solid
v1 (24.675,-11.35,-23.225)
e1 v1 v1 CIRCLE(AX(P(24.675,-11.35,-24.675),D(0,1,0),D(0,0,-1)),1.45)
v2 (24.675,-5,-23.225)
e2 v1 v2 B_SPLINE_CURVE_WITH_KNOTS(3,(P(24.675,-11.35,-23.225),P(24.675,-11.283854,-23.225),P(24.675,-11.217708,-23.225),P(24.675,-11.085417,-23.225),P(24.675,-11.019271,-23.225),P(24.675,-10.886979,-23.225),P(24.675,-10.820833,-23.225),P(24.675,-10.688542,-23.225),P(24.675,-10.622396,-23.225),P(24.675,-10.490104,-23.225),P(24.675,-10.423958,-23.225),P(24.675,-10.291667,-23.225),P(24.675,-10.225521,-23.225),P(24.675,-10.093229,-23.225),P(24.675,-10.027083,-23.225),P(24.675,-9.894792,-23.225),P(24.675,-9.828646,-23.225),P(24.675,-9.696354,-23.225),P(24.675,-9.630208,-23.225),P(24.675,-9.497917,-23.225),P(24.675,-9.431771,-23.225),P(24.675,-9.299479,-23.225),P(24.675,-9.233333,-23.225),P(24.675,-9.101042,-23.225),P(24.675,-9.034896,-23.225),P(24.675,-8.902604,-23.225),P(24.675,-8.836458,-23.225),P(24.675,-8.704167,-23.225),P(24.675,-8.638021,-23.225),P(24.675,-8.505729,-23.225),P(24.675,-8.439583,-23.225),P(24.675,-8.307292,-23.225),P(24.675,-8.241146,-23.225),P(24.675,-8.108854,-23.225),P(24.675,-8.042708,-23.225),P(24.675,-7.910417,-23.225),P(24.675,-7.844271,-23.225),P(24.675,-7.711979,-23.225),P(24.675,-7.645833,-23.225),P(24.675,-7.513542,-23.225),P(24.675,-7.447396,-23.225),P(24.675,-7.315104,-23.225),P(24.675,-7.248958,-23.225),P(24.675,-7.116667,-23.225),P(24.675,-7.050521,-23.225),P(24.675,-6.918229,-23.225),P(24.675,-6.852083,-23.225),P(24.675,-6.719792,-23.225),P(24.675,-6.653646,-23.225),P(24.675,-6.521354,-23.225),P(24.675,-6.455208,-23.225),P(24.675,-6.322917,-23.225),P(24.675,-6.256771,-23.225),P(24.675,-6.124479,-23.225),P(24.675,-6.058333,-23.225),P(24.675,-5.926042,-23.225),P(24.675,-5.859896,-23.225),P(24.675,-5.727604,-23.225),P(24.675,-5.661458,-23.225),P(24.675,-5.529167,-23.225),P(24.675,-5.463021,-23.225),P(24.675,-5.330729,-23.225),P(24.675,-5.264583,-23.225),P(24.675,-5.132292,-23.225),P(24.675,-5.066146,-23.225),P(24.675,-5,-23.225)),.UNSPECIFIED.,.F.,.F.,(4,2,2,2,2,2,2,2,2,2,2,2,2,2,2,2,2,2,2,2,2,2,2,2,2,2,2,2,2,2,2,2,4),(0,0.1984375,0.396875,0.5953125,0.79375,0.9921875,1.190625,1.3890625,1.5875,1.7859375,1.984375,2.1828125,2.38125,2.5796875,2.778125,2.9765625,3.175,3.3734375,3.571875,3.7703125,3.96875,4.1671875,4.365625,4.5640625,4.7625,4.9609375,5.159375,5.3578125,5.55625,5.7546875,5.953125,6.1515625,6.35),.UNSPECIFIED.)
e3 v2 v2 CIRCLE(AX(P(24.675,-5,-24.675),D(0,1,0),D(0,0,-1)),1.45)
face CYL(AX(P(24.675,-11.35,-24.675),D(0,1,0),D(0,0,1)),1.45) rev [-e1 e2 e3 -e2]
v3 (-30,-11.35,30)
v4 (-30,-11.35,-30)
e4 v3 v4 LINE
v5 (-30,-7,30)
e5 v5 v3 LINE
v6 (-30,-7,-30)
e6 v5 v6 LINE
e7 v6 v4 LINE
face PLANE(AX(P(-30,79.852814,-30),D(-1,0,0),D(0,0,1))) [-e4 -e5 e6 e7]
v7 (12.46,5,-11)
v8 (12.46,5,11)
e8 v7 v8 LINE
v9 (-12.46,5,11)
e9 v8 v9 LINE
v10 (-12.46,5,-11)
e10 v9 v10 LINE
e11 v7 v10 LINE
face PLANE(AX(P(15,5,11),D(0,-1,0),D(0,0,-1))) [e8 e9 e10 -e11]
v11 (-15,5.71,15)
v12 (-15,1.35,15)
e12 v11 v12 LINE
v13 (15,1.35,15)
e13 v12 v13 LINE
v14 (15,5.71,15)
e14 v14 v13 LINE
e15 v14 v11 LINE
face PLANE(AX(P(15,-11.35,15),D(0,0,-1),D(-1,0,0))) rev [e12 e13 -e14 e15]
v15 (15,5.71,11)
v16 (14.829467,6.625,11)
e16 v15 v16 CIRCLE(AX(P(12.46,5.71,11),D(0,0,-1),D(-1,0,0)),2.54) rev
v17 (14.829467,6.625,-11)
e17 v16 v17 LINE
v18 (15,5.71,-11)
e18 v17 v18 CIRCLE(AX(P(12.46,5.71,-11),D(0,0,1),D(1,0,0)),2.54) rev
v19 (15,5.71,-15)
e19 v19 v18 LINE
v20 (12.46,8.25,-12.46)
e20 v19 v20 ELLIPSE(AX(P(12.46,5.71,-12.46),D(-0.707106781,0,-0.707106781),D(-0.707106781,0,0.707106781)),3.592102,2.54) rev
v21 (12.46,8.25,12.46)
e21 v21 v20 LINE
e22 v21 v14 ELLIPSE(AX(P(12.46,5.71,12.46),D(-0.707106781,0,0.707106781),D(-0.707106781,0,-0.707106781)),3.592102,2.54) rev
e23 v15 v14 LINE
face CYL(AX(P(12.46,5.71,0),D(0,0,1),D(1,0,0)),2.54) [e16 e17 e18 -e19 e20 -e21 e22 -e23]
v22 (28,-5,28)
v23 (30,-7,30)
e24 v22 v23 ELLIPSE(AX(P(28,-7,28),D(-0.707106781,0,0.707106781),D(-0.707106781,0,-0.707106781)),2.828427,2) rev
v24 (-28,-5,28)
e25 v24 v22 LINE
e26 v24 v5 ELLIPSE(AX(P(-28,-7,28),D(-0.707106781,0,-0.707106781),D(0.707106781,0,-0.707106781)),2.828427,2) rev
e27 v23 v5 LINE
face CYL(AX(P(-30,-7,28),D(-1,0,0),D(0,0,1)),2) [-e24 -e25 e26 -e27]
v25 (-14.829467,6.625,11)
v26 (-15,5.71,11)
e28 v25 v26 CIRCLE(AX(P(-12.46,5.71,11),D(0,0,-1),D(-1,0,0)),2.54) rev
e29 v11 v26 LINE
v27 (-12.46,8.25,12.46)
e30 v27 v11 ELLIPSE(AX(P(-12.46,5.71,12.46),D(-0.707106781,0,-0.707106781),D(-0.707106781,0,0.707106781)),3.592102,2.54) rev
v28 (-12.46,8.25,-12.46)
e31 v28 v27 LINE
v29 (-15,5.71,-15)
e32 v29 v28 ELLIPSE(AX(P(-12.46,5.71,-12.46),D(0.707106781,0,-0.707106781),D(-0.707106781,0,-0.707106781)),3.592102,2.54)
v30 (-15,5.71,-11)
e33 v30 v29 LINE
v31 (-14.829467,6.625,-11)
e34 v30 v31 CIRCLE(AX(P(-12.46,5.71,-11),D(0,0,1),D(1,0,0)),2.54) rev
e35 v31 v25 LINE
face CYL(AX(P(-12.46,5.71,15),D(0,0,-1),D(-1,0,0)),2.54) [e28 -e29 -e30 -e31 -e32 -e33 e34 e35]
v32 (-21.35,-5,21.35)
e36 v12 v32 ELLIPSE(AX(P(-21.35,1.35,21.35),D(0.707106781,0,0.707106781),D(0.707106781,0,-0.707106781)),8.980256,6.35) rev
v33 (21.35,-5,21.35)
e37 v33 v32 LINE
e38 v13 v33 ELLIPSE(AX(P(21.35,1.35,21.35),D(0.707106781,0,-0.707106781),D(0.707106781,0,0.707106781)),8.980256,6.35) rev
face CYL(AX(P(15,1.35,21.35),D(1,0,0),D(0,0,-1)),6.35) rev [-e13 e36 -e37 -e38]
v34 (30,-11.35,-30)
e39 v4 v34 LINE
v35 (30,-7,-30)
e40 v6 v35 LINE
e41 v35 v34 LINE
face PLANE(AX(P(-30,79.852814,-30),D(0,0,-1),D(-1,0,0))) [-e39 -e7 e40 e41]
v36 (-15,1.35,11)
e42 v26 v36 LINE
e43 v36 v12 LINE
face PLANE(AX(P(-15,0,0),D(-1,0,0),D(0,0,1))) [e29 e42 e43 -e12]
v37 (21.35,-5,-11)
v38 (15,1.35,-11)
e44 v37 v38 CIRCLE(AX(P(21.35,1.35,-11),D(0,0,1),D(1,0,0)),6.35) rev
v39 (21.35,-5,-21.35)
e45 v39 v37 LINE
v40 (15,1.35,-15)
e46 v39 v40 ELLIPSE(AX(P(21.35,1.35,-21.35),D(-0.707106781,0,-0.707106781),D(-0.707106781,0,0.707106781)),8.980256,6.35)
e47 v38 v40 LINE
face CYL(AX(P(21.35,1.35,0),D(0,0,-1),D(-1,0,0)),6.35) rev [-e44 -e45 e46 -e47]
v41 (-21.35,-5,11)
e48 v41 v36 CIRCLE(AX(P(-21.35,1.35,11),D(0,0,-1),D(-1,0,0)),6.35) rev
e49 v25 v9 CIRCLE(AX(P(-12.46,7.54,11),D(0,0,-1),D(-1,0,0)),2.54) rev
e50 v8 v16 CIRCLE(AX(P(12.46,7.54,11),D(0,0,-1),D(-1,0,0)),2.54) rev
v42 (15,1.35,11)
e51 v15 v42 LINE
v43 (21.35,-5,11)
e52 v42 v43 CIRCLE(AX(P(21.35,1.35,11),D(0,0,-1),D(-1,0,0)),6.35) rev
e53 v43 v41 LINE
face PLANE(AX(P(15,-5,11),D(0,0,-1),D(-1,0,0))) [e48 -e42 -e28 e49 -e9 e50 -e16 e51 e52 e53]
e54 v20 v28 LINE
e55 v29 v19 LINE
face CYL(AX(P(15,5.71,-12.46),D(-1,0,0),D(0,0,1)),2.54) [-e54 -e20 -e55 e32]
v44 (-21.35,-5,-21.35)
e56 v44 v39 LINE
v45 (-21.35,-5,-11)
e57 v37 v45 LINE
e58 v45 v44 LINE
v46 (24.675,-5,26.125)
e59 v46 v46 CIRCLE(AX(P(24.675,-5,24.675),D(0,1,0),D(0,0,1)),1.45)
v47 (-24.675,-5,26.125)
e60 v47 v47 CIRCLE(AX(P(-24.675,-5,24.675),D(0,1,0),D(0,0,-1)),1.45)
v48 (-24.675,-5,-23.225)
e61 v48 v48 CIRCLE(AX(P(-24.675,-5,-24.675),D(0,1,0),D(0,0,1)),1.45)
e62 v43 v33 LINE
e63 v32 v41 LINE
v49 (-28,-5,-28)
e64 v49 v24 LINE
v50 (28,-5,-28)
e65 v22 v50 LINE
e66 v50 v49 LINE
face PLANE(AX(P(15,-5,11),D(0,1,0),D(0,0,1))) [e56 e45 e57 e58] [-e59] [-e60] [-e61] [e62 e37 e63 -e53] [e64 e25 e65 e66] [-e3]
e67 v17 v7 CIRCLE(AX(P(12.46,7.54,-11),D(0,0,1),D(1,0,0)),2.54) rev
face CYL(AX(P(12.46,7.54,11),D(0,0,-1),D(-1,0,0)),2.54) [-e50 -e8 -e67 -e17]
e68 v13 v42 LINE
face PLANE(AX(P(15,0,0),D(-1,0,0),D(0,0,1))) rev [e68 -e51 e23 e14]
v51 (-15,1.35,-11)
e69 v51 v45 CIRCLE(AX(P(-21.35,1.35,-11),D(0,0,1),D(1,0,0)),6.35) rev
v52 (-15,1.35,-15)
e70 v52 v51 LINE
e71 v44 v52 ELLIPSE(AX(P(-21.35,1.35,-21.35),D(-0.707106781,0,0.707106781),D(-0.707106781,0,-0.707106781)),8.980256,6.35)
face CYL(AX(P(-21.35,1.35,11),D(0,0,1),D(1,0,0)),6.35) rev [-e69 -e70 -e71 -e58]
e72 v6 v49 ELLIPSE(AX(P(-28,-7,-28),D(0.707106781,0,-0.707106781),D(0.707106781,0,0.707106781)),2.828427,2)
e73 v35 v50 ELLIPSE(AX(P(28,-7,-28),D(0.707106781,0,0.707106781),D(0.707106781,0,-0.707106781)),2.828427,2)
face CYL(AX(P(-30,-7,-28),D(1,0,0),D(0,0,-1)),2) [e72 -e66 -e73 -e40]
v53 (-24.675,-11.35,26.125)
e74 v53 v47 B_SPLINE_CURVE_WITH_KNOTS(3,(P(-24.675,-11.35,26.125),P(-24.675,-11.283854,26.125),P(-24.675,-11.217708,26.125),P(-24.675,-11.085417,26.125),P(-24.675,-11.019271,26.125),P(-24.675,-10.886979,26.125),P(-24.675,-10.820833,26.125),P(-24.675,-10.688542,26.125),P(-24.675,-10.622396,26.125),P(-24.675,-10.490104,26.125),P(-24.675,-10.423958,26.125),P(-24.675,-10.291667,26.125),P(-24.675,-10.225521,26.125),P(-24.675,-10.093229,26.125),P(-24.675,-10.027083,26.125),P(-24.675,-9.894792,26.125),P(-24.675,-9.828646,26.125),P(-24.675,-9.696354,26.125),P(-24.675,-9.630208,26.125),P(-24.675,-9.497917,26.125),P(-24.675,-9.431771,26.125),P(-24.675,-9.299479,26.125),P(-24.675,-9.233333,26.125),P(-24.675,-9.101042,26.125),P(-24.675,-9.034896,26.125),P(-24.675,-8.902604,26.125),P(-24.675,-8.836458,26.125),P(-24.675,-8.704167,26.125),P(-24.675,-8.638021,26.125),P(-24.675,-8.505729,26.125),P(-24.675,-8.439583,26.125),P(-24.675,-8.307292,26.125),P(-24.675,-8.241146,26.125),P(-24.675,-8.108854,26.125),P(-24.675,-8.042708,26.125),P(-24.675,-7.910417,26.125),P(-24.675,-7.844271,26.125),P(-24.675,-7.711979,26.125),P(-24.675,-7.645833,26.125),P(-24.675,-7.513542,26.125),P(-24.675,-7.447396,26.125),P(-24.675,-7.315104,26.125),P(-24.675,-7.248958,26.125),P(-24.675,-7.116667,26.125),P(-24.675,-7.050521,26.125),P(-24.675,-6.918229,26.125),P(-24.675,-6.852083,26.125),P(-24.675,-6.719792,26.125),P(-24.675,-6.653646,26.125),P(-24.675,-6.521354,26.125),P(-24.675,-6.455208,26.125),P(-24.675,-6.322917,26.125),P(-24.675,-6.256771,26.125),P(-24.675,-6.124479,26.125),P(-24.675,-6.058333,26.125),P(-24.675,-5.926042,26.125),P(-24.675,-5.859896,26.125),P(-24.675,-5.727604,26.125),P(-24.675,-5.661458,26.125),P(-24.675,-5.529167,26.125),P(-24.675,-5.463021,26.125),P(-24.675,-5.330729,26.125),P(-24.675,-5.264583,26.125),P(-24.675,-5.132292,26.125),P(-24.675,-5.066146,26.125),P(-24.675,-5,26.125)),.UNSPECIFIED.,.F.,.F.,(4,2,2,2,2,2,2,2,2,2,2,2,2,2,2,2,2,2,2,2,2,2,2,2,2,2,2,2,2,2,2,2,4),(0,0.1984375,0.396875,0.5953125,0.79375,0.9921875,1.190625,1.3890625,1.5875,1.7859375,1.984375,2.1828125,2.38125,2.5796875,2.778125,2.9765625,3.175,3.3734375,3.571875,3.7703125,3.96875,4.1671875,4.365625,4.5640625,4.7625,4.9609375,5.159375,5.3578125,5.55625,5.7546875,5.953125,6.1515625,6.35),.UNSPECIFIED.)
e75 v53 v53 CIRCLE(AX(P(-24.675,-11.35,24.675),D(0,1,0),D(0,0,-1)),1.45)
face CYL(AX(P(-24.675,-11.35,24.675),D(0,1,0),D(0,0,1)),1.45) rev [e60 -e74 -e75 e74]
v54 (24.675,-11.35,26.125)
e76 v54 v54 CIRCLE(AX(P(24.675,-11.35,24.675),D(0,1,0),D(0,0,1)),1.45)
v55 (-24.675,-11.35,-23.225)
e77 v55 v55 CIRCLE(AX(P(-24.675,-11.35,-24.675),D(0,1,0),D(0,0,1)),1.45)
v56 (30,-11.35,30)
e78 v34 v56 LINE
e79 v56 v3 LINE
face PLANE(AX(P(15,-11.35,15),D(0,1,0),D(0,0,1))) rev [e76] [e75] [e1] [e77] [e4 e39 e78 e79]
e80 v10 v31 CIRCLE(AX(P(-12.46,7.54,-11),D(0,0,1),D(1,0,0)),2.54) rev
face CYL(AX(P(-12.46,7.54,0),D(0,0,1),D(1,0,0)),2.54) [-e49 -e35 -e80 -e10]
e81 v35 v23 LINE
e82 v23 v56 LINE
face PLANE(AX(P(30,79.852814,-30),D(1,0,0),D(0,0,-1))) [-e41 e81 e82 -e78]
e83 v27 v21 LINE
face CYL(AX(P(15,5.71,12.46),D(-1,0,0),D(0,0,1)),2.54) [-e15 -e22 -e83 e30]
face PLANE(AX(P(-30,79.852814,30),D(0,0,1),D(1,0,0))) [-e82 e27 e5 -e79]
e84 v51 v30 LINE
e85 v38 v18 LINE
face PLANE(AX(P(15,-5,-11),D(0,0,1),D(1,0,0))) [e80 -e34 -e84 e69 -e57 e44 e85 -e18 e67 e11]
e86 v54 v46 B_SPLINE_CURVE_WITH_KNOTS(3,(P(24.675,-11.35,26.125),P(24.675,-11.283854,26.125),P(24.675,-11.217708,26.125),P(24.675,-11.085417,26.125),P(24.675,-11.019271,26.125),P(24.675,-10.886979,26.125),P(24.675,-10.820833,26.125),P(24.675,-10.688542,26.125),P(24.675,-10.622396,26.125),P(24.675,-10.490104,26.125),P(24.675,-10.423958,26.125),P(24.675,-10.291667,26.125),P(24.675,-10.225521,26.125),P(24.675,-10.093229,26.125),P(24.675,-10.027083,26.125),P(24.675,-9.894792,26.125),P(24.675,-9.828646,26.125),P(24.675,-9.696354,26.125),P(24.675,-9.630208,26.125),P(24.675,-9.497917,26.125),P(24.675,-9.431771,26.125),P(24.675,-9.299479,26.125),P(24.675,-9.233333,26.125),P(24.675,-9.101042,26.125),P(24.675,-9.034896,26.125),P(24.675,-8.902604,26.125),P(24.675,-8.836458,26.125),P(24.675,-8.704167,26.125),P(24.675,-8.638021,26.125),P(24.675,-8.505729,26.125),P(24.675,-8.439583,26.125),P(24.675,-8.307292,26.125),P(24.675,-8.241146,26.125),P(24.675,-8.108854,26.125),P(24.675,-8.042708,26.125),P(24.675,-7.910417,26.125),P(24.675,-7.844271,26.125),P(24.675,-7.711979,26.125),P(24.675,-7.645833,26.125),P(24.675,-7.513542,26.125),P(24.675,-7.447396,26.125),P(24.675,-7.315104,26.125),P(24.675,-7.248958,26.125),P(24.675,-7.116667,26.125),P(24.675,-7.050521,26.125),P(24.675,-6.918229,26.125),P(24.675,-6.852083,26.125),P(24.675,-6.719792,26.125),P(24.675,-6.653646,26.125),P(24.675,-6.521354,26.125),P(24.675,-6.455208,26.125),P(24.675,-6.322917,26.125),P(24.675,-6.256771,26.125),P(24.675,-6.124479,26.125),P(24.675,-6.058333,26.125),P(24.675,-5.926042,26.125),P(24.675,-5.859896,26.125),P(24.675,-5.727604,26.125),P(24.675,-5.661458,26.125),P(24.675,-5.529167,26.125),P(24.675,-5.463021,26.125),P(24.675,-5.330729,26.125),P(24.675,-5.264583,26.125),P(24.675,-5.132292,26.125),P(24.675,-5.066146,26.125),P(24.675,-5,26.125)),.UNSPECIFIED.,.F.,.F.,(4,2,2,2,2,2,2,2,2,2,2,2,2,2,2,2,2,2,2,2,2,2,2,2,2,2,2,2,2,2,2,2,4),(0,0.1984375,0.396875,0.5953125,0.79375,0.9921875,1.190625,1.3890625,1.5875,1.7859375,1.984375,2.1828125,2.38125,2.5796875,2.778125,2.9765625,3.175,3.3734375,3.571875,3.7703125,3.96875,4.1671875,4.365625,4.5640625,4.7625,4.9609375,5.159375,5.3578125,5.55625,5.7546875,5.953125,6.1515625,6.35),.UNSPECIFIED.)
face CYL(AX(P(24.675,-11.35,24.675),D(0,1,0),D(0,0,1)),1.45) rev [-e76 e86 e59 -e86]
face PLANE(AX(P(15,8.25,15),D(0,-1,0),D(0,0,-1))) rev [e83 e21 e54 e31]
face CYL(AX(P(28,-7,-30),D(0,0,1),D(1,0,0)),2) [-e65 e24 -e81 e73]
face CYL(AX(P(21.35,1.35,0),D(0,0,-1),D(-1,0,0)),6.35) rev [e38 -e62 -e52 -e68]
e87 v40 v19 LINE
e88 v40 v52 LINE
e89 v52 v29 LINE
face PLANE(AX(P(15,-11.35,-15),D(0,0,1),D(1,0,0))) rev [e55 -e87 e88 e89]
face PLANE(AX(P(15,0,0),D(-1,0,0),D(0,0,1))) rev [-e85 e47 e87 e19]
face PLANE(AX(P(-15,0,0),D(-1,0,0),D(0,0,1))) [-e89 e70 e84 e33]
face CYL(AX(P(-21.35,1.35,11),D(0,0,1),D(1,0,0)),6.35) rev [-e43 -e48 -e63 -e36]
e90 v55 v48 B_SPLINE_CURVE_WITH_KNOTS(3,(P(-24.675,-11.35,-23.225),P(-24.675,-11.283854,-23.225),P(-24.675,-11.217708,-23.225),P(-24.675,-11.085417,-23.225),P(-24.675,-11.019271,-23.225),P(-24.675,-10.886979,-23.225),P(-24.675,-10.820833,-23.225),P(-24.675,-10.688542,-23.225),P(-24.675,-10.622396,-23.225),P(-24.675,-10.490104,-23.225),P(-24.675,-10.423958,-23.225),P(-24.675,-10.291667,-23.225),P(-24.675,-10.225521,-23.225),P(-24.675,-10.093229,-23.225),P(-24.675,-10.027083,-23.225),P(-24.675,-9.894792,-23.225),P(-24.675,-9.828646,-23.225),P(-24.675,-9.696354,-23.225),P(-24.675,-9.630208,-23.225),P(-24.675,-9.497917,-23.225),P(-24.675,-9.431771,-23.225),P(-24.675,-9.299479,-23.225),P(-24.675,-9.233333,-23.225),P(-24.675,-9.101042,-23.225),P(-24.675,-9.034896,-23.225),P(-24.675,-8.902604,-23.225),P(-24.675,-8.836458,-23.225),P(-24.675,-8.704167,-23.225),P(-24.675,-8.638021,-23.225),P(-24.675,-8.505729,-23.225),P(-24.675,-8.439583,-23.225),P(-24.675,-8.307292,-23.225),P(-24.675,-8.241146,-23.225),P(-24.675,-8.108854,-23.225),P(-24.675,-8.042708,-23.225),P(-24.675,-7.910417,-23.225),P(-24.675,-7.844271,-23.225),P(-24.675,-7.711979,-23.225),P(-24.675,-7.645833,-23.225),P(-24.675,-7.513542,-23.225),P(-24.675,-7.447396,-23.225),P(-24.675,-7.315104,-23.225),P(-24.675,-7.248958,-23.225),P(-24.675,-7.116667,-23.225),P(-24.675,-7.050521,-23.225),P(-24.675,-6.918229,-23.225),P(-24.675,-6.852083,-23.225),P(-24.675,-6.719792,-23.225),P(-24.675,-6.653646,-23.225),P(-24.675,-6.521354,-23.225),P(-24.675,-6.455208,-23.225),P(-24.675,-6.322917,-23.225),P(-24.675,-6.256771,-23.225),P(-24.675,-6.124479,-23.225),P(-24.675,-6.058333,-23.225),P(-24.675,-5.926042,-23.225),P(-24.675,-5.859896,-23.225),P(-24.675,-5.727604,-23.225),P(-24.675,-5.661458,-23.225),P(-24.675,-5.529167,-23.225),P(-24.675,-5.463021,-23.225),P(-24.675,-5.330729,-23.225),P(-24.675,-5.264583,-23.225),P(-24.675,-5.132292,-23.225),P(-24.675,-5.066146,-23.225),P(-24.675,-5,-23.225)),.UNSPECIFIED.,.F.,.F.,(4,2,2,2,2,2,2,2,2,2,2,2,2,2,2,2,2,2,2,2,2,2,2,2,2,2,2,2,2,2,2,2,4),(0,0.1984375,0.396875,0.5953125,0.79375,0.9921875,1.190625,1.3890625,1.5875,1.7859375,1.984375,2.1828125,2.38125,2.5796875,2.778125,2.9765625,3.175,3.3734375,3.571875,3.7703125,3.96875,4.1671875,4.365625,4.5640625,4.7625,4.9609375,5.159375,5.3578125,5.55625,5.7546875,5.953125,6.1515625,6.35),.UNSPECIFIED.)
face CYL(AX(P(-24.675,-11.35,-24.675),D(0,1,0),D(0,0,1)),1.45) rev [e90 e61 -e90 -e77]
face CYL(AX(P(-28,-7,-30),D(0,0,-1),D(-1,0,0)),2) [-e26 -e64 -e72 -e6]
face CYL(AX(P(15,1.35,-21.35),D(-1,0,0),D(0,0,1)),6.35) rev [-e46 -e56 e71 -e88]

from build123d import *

# Parameters (mm, degrees)
SKETCH2_W           = 30
SKETCH2_H           = 19.6
SKETCH2_W_2         = 22
SKETCH2_H_2         = 10
BOSS_EXTRUDE2_DEPTH = 15
SKETCH3_W           = 60
SKETCH3_H           = 60
BOSS_EXTRUDE3_DEPTH = 6.35
FILLET1_R           = 6.35
FILLET2_R           = 2.54
FILLET3_R           = 2.54
FILLET4_R           = 2
SKETCH4_R           = 1.45
CUT_EXTRUDE1_DEPTH  = 45.447300255


with BuildPart() as part:
    # Sketch2 → Boss-Extrude2 (new, symmetric)
    with BuildSketch(Plane(origin=(0, 0, 0), x_dir=(0, 0, -1), z_dir=(1, 0, 0))):
        with Locations((0, -1.55)):
            Rectangle(SKETCH2_W, SKETCH2_H)
        Rectangle(SKETCH2_W_2, SKETCH2_H_2, mode=Mode.SUBTRACT)
    extrude(amount=BOSS_EXTRUDE2_DEPTH, both=True)

    # Sketch3 → Boss-Extrude3 (add)
    with BuildSketch(Plane.XZ.offset(11.35)):
        Rectangle(SKETCH3_W, SKETCH3_H)
    extrude(amount=-BOSS_EXTRUDE3_DEPTH)

    # Fillet1
    fillet1_edges = [part.edges().sort_by_distance(p)[0] for p in [
        (-15, -5, 13),
        (-15, -5, -13),
        (0, -5, 15),
        (15, -5, 13),
        (15, -5, -13),
        (0, -5, -15),
    ]]
    fillet(fillet1_edges, radius=FILLET1_R)

    # Fillet2
    fillet2_edges = [part.edges().sort_by_distance(p)[0] for p in [
        (-15, 8.25, 0),
        (0, 8.25, 15),
        (0, 8.25, -15),
        (15, 8.25, 0),
    ]]
    fillet(fillet2_edges, radius=FILLET2_R)

    # Fillet3
    # the kernel refuses this fillet: 2.54 mm, written as the material it takes off along each edge
    with BuildSketch(Plane(origin=(-15, 5, -11), x_dir=(0, 1, 0), z_dir=(0, 0, 1))) as fillet3_piece_1:
        with BuildLine():
            CenterArc((FILLET3_R, -FILLET3_R), FILLET3_R, 90, 90)
            Line((0, -FILLET3_R), (0, 0))
            Line((0, 0), (FILLET3_R, 0))
        make_face()
    extrude(amount=22, mode=Mode.SUBTRACT)
    with BuildSketch(Plane(origin=(15, 5, -11), x_dir=(0, 1, 0), z_dir=(0, 0, 1))) as fillet3_piece_2:
        with BuildLine():
            CenterArc((FILLET3_R, FILLET3_R), FILLET3_R, 180, 90)
            Line((0, FILLET3_R), (0, 0))
            Line((0, 0), (FILLET3_R, 0))
        make_face()
    extrude(amount=22, mode=Mode.SUBTRACT)

    # Fillet4
    fillet4_edges = [part.edges().sort_by_distance(p)[0] for p in [
        (0, -5, -30),
        (30, -5, 0),
        (0, -5, 30),
        (-30, -5, 0),
    ]]
    fillet(fillet4_edges, radius=FILLET4_R)

    # Sketch4 → Cut-Extrude1 (cut, through all)
    with BuildSketch(Plane(origin=(0, -5, 0), x_dir=(1, 0, 0), z_dir=(0, 1, 0))):
        with Locations(Location((-24.675, 24.675, 0), (0, 0, 270))):
            Circle(SKETCH4_R)
        with Locations(Location((24.675, 24.675, 0), (0, 0, 270))):
            Circle(SKETCH4_R)
        with Locations(Location((24.675, -24.675, 0), (0, 0, 270))):
            Circle(SKETCH4_R)
        with Locations(Location((-24.675, -24.675, 0), (0, 0, 270))):
            Circle(SKETCH4_R)
    extrude(amount=-CUT_EXTRUDE1_DEPTH, mode=Mode.SUBTRACT)


solid = part.part
